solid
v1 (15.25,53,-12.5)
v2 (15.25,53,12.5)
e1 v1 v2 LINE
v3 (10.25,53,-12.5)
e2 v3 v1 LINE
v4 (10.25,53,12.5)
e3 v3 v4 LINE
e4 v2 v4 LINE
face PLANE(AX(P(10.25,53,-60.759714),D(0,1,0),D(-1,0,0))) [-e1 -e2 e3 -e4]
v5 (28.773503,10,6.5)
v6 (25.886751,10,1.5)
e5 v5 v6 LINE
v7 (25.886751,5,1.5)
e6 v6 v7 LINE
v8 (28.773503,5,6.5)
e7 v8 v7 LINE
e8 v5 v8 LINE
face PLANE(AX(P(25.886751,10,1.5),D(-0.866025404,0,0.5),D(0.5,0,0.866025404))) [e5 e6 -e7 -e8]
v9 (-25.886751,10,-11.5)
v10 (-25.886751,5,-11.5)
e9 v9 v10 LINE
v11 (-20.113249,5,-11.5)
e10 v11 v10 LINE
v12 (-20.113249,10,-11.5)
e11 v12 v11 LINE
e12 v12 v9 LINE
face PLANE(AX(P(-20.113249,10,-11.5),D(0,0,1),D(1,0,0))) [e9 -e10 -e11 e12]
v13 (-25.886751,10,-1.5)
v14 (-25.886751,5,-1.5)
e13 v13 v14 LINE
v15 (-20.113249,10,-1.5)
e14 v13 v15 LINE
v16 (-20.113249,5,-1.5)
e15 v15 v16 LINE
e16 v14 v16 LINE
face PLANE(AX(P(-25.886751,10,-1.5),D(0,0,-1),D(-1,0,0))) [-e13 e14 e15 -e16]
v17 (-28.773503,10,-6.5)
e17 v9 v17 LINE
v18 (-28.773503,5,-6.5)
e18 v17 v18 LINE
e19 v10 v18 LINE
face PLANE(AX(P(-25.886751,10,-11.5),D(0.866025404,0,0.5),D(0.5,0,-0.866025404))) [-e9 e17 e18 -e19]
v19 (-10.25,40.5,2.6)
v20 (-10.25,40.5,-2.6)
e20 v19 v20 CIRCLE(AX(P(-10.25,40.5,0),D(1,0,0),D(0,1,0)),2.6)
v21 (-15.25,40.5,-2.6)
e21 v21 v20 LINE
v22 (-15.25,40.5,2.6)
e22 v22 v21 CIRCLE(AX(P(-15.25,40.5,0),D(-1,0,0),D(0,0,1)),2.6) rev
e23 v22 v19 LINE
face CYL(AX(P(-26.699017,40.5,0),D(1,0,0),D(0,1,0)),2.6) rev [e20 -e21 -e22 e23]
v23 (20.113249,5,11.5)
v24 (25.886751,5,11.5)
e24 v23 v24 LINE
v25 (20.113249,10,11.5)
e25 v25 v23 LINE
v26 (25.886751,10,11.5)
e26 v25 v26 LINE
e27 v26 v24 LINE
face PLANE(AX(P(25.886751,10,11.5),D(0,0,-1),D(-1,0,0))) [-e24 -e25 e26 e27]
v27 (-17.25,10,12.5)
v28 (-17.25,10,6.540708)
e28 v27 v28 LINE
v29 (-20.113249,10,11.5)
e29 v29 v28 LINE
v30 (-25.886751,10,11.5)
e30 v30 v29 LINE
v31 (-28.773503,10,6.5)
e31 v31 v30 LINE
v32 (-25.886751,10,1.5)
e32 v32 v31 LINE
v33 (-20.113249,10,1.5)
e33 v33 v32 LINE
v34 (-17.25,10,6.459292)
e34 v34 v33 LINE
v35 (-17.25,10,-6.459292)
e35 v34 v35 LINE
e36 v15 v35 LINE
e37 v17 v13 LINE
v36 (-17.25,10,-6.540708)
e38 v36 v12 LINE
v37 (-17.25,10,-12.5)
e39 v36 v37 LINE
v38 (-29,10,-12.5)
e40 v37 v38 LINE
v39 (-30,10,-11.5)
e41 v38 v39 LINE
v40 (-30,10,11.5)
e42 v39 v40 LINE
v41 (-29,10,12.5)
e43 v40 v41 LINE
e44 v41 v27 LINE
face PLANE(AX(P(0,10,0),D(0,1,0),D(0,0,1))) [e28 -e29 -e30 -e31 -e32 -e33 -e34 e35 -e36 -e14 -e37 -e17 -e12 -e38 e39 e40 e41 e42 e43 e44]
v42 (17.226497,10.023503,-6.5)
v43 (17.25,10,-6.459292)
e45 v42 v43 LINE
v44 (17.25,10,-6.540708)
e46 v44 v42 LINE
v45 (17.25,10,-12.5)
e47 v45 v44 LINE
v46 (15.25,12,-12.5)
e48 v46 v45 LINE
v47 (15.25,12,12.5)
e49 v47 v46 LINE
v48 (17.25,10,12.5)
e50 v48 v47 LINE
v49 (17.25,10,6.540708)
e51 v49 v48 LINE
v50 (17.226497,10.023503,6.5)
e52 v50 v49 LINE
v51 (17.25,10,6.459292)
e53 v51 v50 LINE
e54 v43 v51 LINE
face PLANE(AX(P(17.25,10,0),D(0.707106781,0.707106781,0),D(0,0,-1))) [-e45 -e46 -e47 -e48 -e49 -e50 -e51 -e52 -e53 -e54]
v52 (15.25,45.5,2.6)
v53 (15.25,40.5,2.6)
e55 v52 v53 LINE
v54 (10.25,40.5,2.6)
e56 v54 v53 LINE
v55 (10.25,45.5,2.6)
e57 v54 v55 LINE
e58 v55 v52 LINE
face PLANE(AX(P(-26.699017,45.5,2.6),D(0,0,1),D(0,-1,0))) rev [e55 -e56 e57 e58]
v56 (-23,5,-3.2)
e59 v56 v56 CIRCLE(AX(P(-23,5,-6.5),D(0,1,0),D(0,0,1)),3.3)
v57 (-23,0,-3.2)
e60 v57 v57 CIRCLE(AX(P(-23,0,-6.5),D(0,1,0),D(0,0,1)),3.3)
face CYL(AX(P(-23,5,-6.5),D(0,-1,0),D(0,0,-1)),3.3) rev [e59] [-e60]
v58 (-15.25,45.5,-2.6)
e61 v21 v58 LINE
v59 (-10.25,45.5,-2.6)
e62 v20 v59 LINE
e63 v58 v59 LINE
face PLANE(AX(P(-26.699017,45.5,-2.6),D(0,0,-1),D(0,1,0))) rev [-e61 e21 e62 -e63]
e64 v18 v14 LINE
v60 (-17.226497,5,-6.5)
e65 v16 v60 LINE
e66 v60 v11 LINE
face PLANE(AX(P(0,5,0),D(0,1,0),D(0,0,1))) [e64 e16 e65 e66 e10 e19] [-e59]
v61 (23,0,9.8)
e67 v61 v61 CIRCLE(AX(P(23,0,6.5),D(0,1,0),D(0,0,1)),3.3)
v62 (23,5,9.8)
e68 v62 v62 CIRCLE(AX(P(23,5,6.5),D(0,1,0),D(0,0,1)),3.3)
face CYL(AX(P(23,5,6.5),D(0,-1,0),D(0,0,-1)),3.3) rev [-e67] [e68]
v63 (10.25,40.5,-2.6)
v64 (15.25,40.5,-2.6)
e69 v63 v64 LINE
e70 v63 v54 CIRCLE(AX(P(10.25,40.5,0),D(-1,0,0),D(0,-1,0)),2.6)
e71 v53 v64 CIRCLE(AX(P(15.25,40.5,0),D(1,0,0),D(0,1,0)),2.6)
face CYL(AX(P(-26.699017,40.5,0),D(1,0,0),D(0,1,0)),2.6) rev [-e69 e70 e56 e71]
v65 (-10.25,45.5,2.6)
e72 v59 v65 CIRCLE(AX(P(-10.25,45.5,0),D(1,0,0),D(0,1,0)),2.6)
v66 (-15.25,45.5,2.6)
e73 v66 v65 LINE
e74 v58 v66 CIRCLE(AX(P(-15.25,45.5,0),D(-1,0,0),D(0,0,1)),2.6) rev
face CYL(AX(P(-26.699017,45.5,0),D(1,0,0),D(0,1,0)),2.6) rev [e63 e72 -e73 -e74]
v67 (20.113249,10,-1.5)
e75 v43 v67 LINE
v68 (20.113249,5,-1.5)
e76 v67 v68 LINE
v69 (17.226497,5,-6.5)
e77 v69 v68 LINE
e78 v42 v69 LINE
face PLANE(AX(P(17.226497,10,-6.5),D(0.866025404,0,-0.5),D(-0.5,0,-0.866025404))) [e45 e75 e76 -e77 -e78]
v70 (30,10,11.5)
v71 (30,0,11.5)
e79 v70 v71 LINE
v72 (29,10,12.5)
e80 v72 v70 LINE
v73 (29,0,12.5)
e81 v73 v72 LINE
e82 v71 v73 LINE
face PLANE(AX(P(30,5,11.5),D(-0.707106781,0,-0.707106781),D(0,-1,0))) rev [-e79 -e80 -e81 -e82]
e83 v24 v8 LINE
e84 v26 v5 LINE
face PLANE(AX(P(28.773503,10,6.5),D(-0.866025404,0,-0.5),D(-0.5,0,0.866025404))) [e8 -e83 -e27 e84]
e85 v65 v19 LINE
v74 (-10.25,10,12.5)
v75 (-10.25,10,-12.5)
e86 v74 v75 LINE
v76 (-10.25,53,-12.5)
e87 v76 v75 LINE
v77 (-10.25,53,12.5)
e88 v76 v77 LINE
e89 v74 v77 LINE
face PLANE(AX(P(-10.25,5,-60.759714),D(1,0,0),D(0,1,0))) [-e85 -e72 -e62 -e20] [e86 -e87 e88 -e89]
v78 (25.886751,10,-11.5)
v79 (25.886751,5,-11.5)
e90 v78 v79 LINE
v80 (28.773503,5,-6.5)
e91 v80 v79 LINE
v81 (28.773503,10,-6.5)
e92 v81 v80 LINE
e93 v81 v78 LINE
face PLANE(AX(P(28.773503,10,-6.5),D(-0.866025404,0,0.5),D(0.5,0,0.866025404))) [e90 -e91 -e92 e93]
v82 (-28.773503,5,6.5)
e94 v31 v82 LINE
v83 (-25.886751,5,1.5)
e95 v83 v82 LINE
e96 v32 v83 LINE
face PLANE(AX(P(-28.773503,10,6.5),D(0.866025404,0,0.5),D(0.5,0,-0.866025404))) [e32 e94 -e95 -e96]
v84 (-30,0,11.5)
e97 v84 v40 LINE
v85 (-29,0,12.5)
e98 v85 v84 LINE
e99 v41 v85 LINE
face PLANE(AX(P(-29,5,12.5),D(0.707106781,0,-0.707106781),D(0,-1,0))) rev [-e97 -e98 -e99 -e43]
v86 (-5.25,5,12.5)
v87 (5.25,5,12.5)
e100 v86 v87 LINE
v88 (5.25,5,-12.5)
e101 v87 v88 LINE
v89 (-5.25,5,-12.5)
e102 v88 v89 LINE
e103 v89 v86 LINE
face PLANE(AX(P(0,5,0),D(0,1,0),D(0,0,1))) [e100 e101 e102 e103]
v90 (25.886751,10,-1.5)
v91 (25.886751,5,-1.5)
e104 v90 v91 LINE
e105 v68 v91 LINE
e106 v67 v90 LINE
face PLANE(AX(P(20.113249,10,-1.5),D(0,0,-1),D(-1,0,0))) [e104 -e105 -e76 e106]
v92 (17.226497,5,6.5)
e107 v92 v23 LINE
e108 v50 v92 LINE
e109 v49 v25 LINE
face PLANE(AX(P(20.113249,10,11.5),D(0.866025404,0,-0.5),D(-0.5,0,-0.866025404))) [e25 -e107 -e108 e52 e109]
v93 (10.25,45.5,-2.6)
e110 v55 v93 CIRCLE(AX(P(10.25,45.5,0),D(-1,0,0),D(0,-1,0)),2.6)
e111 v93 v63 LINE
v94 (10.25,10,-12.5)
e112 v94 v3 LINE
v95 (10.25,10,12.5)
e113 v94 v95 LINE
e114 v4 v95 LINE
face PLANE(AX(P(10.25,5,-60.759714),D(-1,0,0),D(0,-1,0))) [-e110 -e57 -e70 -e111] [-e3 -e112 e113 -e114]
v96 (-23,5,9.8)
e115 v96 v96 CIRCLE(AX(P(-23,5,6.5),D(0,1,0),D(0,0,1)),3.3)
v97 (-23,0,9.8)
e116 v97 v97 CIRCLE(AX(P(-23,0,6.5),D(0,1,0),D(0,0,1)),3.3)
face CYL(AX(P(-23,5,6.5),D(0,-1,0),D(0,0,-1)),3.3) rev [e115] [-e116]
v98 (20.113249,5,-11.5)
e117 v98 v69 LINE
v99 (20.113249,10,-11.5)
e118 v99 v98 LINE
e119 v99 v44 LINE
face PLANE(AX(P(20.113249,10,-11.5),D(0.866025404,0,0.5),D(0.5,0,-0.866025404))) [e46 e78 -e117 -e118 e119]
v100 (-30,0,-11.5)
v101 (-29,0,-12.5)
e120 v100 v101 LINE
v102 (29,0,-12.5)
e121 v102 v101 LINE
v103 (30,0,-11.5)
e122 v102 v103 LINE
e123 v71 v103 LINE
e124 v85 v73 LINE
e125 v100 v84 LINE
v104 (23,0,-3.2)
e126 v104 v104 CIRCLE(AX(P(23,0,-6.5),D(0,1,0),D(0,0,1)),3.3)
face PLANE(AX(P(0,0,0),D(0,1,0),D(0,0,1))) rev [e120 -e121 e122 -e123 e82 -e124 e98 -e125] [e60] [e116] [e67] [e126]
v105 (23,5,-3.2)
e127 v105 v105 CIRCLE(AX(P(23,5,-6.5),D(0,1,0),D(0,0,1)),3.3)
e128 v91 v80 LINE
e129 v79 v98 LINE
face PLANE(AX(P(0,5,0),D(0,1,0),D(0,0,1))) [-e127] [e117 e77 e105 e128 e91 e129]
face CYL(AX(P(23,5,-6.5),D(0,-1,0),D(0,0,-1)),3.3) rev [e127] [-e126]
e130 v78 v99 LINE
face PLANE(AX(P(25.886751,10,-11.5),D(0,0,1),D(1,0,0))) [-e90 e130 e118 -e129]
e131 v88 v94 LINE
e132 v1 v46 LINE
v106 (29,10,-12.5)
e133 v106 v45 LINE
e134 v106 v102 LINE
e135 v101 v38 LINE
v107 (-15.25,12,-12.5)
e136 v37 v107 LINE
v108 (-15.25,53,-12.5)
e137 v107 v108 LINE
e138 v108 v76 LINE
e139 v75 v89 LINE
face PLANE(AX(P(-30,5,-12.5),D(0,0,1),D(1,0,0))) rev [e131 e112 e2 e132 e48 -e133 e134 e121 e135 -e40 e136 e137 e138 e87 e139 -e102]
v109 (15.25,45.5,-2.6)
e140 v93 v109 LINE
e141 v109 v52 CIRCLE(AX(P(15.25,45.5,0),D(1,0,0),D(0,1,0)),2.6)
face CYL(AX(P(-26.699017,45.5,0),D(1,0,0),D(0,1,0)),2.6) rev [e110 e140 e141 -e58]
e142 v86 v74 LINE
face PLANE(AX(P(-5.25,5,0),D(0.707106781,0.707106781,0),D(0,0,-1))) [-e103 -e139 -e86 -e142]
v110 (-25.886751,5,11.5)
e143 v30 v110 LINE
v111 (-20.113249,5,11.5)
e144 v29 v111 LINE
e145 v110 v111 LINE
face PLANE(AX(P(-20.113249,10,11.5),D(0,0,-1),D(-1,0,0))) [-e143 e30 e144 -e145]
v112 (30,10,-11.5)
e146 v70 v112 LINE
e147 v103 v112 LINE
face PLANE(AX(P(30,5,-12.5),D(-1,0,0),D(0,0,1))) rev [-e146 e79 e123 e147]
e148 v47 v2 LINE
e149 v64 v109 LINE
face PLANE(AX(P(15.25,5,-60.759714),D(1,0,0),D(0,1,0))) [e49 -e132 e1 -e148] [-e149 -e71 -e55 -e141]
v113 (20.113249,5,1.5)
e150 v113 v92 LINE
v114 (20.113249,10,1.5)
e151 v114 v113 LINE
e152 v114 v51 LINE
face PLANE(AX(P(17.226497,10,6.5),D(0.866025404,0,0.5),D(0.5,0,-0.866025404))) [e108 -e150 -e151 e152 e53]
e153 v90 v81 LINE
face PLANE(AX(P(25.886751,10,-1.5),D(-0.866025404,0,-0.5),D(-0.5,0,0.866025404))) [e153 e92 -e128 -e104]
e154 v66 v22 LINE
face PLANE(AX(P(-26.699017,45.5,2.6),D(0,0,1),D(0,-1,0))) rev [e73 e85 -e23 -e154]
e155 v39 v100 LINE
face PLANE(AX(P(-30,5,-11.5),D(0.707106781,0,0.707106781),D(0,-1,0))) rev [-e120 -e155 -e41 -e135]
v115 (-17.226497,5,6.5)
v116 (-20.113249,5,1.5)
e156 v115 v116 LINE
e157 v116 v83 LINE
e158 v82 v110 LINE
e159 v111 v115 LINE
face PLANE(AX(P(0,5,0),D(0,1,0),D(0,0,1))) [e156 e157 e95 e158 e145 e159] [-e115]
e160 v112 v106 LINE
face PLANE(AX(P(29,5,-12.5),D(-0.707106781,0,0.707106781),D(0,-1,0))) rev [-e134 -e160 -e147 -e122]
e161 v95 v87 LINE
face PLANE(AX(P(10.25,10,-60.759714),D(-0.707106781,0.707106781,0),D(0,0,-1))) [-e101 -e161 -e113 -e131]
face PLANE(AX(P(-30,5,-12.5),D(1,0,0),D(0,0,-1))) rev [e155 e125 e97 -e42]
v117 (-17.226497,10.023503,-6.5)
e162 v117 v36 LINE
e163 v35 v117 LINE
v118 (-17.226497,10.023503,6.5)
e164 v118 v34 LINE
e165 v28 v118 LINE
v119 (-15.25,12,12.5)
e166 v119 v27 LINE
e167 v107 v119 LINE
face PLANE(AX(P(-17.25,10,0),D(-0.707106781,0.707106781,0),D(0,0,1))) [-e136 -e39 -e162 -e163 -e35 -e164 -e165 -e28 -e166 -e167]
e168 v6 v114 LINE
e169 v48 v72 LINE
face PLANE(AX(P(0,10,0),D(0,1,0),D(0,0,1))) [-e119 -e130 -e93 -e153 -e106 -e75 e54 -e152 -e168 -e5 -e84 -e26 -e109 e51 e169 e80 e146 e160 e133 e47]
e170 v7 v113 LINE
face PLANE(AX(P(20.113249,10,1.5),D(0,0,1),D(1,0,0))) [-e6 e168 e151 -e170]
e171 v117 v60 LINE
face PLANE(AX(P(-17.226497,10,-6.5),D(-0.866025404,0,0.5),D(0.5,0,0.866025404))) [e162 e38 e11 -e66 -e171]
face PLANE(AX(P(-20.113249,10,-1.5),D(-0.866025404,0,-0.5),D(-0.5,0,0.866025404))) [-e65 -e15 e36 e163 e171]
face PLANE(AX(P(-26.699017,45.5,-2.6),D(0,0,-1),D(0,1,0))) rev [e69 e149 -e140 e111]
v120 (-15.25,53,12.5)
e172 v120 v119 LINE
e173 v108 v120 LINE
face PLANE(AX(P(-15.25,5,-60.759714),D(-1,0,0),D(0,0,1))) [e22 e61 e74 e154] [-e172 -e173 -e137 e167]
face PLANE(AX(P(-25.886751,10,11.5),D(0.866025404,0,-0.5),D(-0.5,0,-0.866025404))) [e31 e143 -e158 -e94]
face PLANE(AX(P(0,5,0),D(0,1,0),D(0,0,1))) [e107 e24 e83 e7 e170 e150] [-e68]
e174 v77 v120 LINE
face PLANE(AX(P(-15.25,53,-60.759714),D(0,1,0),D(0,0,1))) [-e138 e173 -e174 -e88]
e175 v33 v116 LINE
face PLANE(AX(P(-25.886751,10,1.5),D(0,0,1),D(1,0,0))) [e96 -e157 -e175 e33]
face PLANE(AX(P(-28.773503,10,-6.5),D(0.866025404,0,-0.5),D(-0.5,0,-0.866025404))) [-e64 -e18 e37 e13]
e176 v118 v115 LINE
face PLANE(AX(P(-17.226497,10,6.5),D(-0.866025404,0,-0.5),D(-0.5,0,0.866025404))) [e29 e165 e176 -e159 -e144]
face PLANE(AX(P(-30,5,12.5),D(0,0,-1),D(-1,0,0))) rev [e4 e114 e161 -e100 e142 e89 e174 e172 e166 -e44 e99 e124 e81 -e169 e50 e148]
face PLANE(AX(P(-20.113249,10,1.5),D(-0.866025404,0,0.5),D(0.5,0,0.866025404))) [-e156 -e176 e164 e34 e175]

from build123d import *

# Parameters (mm, degrees)
SKETCH2_W           = 60
SKETCH2_H           = 25
SKETCH2_R           = 3.3
BOSS_EXTRUDE2_DEPTH = 5
SKETCH3_W           = 5
SKETCH3_H           = 48
BOSS_EXTRUDE3_DEPTH = 25
CUT_EXTRUDE1_REACH  = 72.801
SKETCH5_W           = 14.75
SKETCH5_H           = 25
BOSS_EXTRUDE4_DEPTH = 5
CHAMFER1_SIZE       = 2
CHAMFER2_SIZE       = 5
CHAMFER3_SIZE       = 1


with BuildPart() as part:
    # Sketch2 → Boss-Extrude2 (new body)
    with BuildSketch(Plane(origin=(0, 0, 0), x_dir=(1, 0, 0), z_dir=(0, 1, 0))):
        Rectangle(SKETCH2_W, SKETCH2_H)
        with Locations(Location((-23, 6.5, 0), (0, 0, 270))):
            Circle(SKETCH2_R, mode=Mode.SUBTRACT)
        with Locations(Location((23, 6.5, 0), (0, 0, 270))):
            Circle(SKETCH2_R, mode=Mode.SUBTRACT)
        with Locations(Location((-23, -6.5, 0), (0, 0, 270))):
            Circle(SKETCH2_R, mode=Mode.SUBTRACT)
        with Locations(Location((23, -6.5, 0), (0, 0, 270))):
            Circle(SKETCH2_R, mode=Mode.SUBTRACT)
    extrude(amount=BOSS_EXTRUDE2_DEPTH)

    # Sketch3 → Boss-Extrude3 (add)
    with BuildSketch(Plane.XY.offset(12.5)):
        with Locations((-12.75, 29)):
            Rectangle(SKETCH3_W, SKETCH3_H)
        with Locations((12.75, 29)):
            Rectangle(SKETCH3_W, SKETCH3_H)
    extrude(amount=-BOSS_EXTRUDE3_DEPTH)

    # Cut-Extrude1: up to this face of the body (flat: up to its plane)
    cut_extrude1_end = Plane(part.part.faces().sort_by_distance((-15.25, 29, 0))[0])
    # Sketch4 → Cut-Extrude1 (cut, up to the picked face)
    with BuildSketch(Plane(origin=(15.25, 0, 0), x_dir=(0, 0, -1), z_dir=(1, 0, 0)), mode=Mode.PRIVATE) as cut_extrude1_sk1:
        with BuildLine():
            Line((2.6, 45.5), (2.6, 40.5))
            ThreePointArc((2.6, 40.5), (0, 37.9), (-2.6, 40.5))
            Line((-2.6, 40.5), (-2.6, 45.5))
            ThreePointArc((-2.6, 45.5), (0, 48.1), (2.6, 45.5))
        make_face()
    cut_extrude1_tool1 = split(extrude(cut_extrude1_sk1.sketch, amount=-CUT_EXTRUDE1_REACH, mode=Mode.PRIVATE), bisect_by=cut_extrude1_end, keep=Keep.BOTH, mode=Mode.PRIVATE)
    add(cut_extrude1_tool1.solids().sort_by(Axis((15.25, 43, 0), (-1, 0, 0)))[0], mode=Mode.SUBTRACT)

    # Sketch5 → Boss-Extrude4 (add)
    # profile 1 of 2: a face of its own
    with BuildSketch(Plane(origin=(0, 5, 0), x_dir=(1, 0, 0), z_dir=(0, 1, 0))):
        with Locations((22.625, 0)):
            Rectangle(SKETCH5_W, SKETCH5_H)
        Polygon((28.773502692, 6.5), (25.886751346, 11.5), (20.113248654, 11.5), (17.226497308, 6.5), (20.113248654, 1.5), (25.886751346, 1.5), align=None, mode=Mode.SUBTRACT)
        Polygon((25.886751346, -1.5), (28.773502692, -6.5), (25.886751346, -11.5), (20.113248654, -11.5), (17.226497308, -6.5), (20.113248654, -1.5), align=None, mode=Mode.SUBTRACT)
    # profile 2 of 2: a face of its own
    with BuildSketch(Plane(origin=(0, 5, 0), x_dir=(1, 0, 0), z_dir=(0, 1, 0))):
        with Locations((-22.625, 0)):
            Rectangle(SKETCH5_W, SKETCH5_H)
        Polygon((-17.226497308, 6.5), (-20.113248654, 11.5), (-25.886751346, 11.5), (-28.773502692, 6.5), (-25.886751346, 1.5), (-20.113248654, 1.5), align=None, mode=Mode.SUBTRACT)
        Polygon((-20.113248654, -1.5), (-17.226497308, -6.5), (-20.113248654, -11.5), (-25.886751346, -11.5), (-28.773502692, -6.5), (-25.886751346, -1.5), align=None, mode=Mode.SUBTRACT)
    extrude(amount=BOSS_EXTRUDE4_DEPTH)

    # Chamfer1
    # the kernel refuses this chamfer: 2 mm, written as the material it adds along each edge
    with BuildSketch(Plane(origin=(15.25, 10, -12.5), x_dir=(0.9996219169112968, -0.02749587661058651, 0), z_dir=(0, 0, 1))) as chamfer1_piece_1_section:
        Polygon((CHAMFER1_SIZE * 0.999621916911, CHAMFER1_SIZE * 0.0274958766106), (-CHAMFER1_SIZE * 0.0274958766106, CHAMFER1_SIZE * 0.999621916911), (0, 0), align=None)
    chamfer1_piece_1 = extrude(amount=25, mode=Mode.PRIVATE)
    chamfer1_piece_1 = split(chamfer1_piece_1, bisect_by=Plane(origin=(15.178146825, 10.596401608, -10.047847108), z_dir=(0.8660254037844565, 0, -0.4999999999999692)), keep=Keep.TOP, mode=Mode.PRIVATE)
    chamfer1_piece_1 = split(chamfer1_piece_1, bisect_by=Plane(origin=(18.675487588, 10.596401608, -9.009724784), z_dir=(-0.8660254037844565, 0, -0.49999999999996914)), keep=Keep.TOP, mode=Mode.PRIVATE)
    add(chamfer1_piece_1)
    with BuildSketch(Plane(origin=(15.25, 10, -12.5), x_dir=(0.9996219169112968, -0.02749587661058651, 0), z_dir=(0, 0, 1))) as chamfer1_piece_2_section:
        Polygon((CHAMFER1_SIZE * 0.999621916911, CHAMFER1_SIZE * 0.0274958766106), (-CHAMFER1_SIZE * 0.0274958766106, CHAMFER1_SIZE * 0.999621916911), (0, 0), align=None)
    chamfer1_piece_2 = extrude(amount=25, mode=Mode.PRIVATE)
    chamfer1_piece_2 = split(chamfer1_piece_2, bisect_by=Plane(origin=(16.849076721, 10.762644927, -7.153711633), z_dir=(-0.8660254037844565, 0, 0.4999999999999692)), keep=Keep.TOP, mode=Mode.PRIVATE)
    chamfer1_piece_2 = split(chamfer1_piece_2, bisect_by=Plane(origin=(16.849076721, 10.762644927, -5.846288367), z_dir=(-0.8660254037844565, 0, -0.49999999999996914)), keep=Keep.TOP, mode=Mode.PRIVATE)
    add(chamfer1_piece_2)
    with BuildSketch(Plane(origin=(15.25, 10, -12.5), x_dir=(0.9996219169112968, -0.02749587661058651, 0), z_dir=(0, 0, 1))) as chamfer1_piece_3_section:
        Polygon((CHAMFER1_SIZE * 0.999621916911, CHAMFER1_SIZE * 0.0274958766106), (-CHAMFER1_SIZE * 0.0274958766106, CHAMFER1_SIZE * 0.999621916911), (0, 0), align=None)
    chamfer1_piece_3 = extrude(amount=25, mode=Mode.PRIVATE)
    chamfer1_piece_3 = split(chamfer1_piece_3, bisect_by=Plane(origin=(14.108732703, 10.603890332, 1.099873298), z_dir=(0.8660254037844565, 0, -0.49999999999996914)), keep=Keep.TOP, mode=Mode.PRIVATE)
    chamfer1_piece_3 = split(chamfer1_piece_3, bisect_by=Plane(origin=(19.737897828, 10.603890332, 2.150126702), z_dir=(-0.8660254037844565, 0, -0.4999999999999692)), keep=Keep.TOP, mode=Mode.PRIVATE)
    chamfer1_piece_3 = split(chamfer1_piece_3, bisect_by=Plane(origin=(19.737897828, 10.603890332, -2.150126702), z_dir=(-0.8660254037844565, 0, 0.4999999999999692)), keep=Keep.TOP, mode=Mode.PRIVATE)
    chamfer1_piece_3 = split(chamfer1_piece_3, bisect_by=Plane(origin=(14.108732703, 10.603890332, -1.099873298), z_dir=(0.8660254037844565, 0, 0.49999999999996914)), keep=Keep.TOP, mode=Mode.PRIVATE)
    add(chamfer1_piece_3)
    with BuildSketch(Plane(origin=(15.25, 10, -12.5), x_dir=(0.9996219169112968, -0.02749587661058651, 0), z_dir=(0, 0, 1))) as chamfer1_piece_4_section:
        Polygon((CHAMFER1_SIZE * 0.999621916911, CHAMFER1_SIZE * 0.0274958766106), (-CHAMFER1_SIZE * 0.0274958766106, CHAMFER1_SIZE * 0.999621916911), (0, 0), align=None)
    chamfer1_piece_4 = extrude(amount=25, mode=Mode.PRIVATE)
    chamfer1_piece_4 = split(chamfer1_piece_4, bisect_by=Plane(origin=(16.849076721, 10.762644927, 5.846288367), z_dir=(-0.8660254037844565, 0, 0.49999999999996914)), keep=Keep.TOP, mode=Mode.PRIVATE)
    chamfer1_piece_4 = split(chamfer1_piece_4, bisect_by=Plane(origin=(16.849076721, 10.762644927, 7.153711633), z_dir=(-0.8660254037844565, 0, -0.4999999999999692)), keep=Keep.TOP, mode=Mode.PRIVATE)
    add(chamfer1_piece_4)
    with BuildSketch(Plane(origin=(15.25, 10, -12.5), x_dir=(0.9996219169112968, -0.02749587661058651, 0), z_dir=(0, 0, 1))) as chamfer1_piece_5_section:
        Polygon((CHAMFER1_SIZE * 0.999621916911, CHAMFER1_SIZE * 0.0274958766106), (-CHAMFER1_SIZE * 0.0274958766106, CHAMFER1_SIZE * 0.999621916911), (0, 0), align=None)
    chamfer1_piece_5 = extrude(amount=25, mode=Mode.PRIVATE)
    chamfer1_piece_5 = split(chamfer1_piece_5, bisect_by=Plane(origin=(18.675487588, 10.596401608, 9.009724784), z_dir=(-0.8660254037844565, 0, 0.49999999999996914)), keep=Keep.TOP, mode=Mode.PRIVATE)
    chamfer1_piece_5 = split(chamfer1_piece_5, bisect_by=Plane(origin=(15.178146825, 10.596401608, 10.047847108), z_dir=(0.8660254037844565, 0, 0.4999999999999692)), keep=Keep.TOP, mode=Mode.PRIVATE)
    add(chamfer1_piece_5)
    with BuildSketch(Plane(origin=(-15.25, 10, 12.5), x_dir=(0.027495876610586487, 0.9996219169112968, 0), z_dir=(0, 0, -1))) as chamfer1_piece_6_section:
        Polygon((CHAMFER1_SIZE * 0.999621916911, -CHAMFER1_SIZE * 0.0274958766106), (-CHAMFER1_SIZE * 0.0274958766106, -CHAMFER1_SIZE * 0.999621916911), (0, 0), align=None)
    chamfer1_piece_6 = extrude(amount=25, mode=Mode.PRIVATE)
    chamfer1_piece_6 = split(chamfer1_piece_6, bisect_by=Plane(origin=(-15.178146825, 10.596401608, 10.047847108), z_dir=(-0.866025403784439, 0, 0.4999999999999995)), keep=Keep.TOP, mode=Mode.PRIVATE)
    chamfer1_piece_6 = split(chamfer1_piece_6, bisect_by=Plane(origin=(-18.675487588, 10.596401608, 9.009724784), z_dir=(0.8660254037844384, 0, 0.5000000000000004)), keep=Keep.TOP, mode=Mode.PRIVATE)
    add(chamfer1_piece_6)
    with BuildSketch(Plane(origin=(-15.25, 10, 12.5), x_dir=(0.027495876610586487, 0.9996219169112968, 0), z_dir=(0, 0, -1))) as chamfer1_piece_7_section:
        Polygon((CHAMFER1_SIZE * 0.999621916911, -CHAMFER1_SIZE * 0.0274958766106), (-CHAMFER1_SIZE * 0.0274958766106, -CHAMFER1_SIZE * 0.999621916911), (0, 0), align=None)
    chamfer1_piece_7 = extrude(amount=25, mode=Mode.PRIVATE)
    chamfer1_piece_7 = split(chamfer1_piece_7, bisect_by=Plane(origin=(-16.849076721, 10.762644927, 7.153711633), z_dir=(0.866025403784439, 0, -0.4999999999999995)), keep=Keep.TOP, mode=Mode.PRIVATE)
    chamfer1_piece_7 = split(chamfer1_piece_7, bisect_by=Plane(origin=(-16.849076721, 10.762644927, 5.846288367), z_dir=(0.8660254037844384, 0, 0.5000000000000004)), keep=Keep.TOP, mode=Mode.PRIVATE)
    add(chamfer1_piece_7)
    with BuildSketch(Plane(origin=(-15.25, 10, 12.5), x_dir=(0.027495876610586487, 0.9996219169112968, 0), z_dir=(0, 0, -1))) as chamfer1_piece_8_section:
        Polygon((CHAMFER1_SIZE * 0.999621916911, -CHAMFER1_SIZE * 0.0274958766106), (-CHAMFER1_SIZE * 0.0274958766106, -CHAMFER1_SIZE * 0.999621916911), (0, 0), align=None)
    chamfer1_piece_8 = extrude(amount=25, mode=Mode.PRIVATE)
    chamfer1_piece_8 = split(chamfer1_piece_8, bisect_by=Plane(origin=(-19.737897828, 10.603890332, 2.150126702), z_dir=(0.866025403784439, 0, -0.4999999999999995)), keep=Keep.TOP, mode=Mode.PRIVATE)
    chamfer1_piece_8 = split(chamfer1_piece_8, bisect_by=Plane(origin=(-14.108732703, 10.603890332, 1.099873298), z_dir=(-0.8660254037844384, 0, -0.5000000000000004)), keep=Keep.TOP, mode=Mode.PRIVATE)
    chamfer1_piece_8 = split(chamfer1_piece_8, bisect_by=Plane(origin=(-14.108732703, 10.603890332, -1.099873298), z_dir=(-0.8660254037844384, 0, 0.5000000000000006)), keep=Keep.TOP, mode=Mode.PRIVATE)
    chamfer1_piece_8 = split(chamfer1_piece_8, bisect_by=Plane(origin=(-19.737897828, 10.603890332, -2.150126702), z_dir=(0.866025403784439, 0, 0.4999999999999995)), keep=Keep.TOP, mode=Mode.PRIVATE)
    add(chamfer1_piece_8)
    with BuildSketch(Plane(origin=(-15.25, 10, 12.5), x_dir=(0.027495876610586487, 0.9996219169112968, 0), z_dir=(0, 0, -1))) as chamfer1_piece_9_section:
        Polygon((CHAMFER1_SIZE * 0.999621916911, -CHAMFER1_SIZE * 0.0274958766106), (-CHAMFER1_SIZE * 0.0274958766106, -CHAMFER1_SIZE * 0.999621916911), (0, 0), align=None)
    chamfer1_piece_9 = extrude(amount=25, mode=Mode.PRIVATE)
    chamfer1_piece_9 = split(chamfer1_piece_9, bisect_by=Plane(origin=(-16.849076721, 10.762644927, -5.846288367), z_dir=(0.8660254037844384, 0, -0.5000000000000006)), keep=Keep.TOP, mode=Mode.PRIVATE)
    chamfer1_piece_9 = split(chamfer1_piece_9, bisect_by=Plane(origin=(-16.849076721, 10.762644927, -7.153711633), z_dir=(0.866025403784439, 0, 0.4999999999999995)), keep=Keep.TOP, mode=Mode.PRIVATE)
    add(chamfer1_piece_9)
    with BuildSketch(Plane(origin=(-15.25, 10, 12.5), x_dir=(0.027495876610586487, 0.9996219169112968, 0), z_dir=(0, 0, -1))) as chamfer1_piece_10_section:
        Polygon((CHAMFER1_SIZE * 0.999621916911, -CHAMFER1_SIZE * 0.0274958766106), (-CHAMFER1_SIZE * 0.0274958766106, -CHAMFER1_SIZE * 0.999621916911), (0, 0), align=None)
    chamfer1_piece_10 = extrude(amount=25, mode=Mode.PRIVATE)
    chamfer1_piece_10 = split(chamfer1_piece_10, bisect_by=Plane(origin=(-18.675487588, 10.596401608, -9.009724784), z_dir=(0.8660254037844384, 0, -0.5000000000000006)), keep=Keep.TOP, mode=Mode.PRIVATE)
    chamfer1_piece_10 = split(chamfer1_piece_10, bisect_by=Plane(origin=(-15.178146825, 10.596401608, -10.047847108), z_dir=(-0.866025403784439, 0, -0.4999999999999995)), keep=Keep.TOP, mode=Mode.PRIVATE)
    add(chamfer1_piece_10)

    # Chamfer2
    chamfer2_edges = [part.edges().sort_by_distance(p)[0] for p in [
        (-10.25, 5, 0),
        (10.25, 5, 0),
    ]]
    chamfer(chamfer2_edges, length=CHAMFER2_SIZE)

    # Chamfer3
    chamfer3_edges = [part.edges().sort_by_distance(p)[0] for p in [
        (30, 5, 12.5),
        (-30, 5, 12.5),
        (-30, 5, -12.5),
        (30, 5, -12.5),
    ]]
    chamfer(chamfer3_edges, length=CHAMFER3_SIZE)


solid = part.part
